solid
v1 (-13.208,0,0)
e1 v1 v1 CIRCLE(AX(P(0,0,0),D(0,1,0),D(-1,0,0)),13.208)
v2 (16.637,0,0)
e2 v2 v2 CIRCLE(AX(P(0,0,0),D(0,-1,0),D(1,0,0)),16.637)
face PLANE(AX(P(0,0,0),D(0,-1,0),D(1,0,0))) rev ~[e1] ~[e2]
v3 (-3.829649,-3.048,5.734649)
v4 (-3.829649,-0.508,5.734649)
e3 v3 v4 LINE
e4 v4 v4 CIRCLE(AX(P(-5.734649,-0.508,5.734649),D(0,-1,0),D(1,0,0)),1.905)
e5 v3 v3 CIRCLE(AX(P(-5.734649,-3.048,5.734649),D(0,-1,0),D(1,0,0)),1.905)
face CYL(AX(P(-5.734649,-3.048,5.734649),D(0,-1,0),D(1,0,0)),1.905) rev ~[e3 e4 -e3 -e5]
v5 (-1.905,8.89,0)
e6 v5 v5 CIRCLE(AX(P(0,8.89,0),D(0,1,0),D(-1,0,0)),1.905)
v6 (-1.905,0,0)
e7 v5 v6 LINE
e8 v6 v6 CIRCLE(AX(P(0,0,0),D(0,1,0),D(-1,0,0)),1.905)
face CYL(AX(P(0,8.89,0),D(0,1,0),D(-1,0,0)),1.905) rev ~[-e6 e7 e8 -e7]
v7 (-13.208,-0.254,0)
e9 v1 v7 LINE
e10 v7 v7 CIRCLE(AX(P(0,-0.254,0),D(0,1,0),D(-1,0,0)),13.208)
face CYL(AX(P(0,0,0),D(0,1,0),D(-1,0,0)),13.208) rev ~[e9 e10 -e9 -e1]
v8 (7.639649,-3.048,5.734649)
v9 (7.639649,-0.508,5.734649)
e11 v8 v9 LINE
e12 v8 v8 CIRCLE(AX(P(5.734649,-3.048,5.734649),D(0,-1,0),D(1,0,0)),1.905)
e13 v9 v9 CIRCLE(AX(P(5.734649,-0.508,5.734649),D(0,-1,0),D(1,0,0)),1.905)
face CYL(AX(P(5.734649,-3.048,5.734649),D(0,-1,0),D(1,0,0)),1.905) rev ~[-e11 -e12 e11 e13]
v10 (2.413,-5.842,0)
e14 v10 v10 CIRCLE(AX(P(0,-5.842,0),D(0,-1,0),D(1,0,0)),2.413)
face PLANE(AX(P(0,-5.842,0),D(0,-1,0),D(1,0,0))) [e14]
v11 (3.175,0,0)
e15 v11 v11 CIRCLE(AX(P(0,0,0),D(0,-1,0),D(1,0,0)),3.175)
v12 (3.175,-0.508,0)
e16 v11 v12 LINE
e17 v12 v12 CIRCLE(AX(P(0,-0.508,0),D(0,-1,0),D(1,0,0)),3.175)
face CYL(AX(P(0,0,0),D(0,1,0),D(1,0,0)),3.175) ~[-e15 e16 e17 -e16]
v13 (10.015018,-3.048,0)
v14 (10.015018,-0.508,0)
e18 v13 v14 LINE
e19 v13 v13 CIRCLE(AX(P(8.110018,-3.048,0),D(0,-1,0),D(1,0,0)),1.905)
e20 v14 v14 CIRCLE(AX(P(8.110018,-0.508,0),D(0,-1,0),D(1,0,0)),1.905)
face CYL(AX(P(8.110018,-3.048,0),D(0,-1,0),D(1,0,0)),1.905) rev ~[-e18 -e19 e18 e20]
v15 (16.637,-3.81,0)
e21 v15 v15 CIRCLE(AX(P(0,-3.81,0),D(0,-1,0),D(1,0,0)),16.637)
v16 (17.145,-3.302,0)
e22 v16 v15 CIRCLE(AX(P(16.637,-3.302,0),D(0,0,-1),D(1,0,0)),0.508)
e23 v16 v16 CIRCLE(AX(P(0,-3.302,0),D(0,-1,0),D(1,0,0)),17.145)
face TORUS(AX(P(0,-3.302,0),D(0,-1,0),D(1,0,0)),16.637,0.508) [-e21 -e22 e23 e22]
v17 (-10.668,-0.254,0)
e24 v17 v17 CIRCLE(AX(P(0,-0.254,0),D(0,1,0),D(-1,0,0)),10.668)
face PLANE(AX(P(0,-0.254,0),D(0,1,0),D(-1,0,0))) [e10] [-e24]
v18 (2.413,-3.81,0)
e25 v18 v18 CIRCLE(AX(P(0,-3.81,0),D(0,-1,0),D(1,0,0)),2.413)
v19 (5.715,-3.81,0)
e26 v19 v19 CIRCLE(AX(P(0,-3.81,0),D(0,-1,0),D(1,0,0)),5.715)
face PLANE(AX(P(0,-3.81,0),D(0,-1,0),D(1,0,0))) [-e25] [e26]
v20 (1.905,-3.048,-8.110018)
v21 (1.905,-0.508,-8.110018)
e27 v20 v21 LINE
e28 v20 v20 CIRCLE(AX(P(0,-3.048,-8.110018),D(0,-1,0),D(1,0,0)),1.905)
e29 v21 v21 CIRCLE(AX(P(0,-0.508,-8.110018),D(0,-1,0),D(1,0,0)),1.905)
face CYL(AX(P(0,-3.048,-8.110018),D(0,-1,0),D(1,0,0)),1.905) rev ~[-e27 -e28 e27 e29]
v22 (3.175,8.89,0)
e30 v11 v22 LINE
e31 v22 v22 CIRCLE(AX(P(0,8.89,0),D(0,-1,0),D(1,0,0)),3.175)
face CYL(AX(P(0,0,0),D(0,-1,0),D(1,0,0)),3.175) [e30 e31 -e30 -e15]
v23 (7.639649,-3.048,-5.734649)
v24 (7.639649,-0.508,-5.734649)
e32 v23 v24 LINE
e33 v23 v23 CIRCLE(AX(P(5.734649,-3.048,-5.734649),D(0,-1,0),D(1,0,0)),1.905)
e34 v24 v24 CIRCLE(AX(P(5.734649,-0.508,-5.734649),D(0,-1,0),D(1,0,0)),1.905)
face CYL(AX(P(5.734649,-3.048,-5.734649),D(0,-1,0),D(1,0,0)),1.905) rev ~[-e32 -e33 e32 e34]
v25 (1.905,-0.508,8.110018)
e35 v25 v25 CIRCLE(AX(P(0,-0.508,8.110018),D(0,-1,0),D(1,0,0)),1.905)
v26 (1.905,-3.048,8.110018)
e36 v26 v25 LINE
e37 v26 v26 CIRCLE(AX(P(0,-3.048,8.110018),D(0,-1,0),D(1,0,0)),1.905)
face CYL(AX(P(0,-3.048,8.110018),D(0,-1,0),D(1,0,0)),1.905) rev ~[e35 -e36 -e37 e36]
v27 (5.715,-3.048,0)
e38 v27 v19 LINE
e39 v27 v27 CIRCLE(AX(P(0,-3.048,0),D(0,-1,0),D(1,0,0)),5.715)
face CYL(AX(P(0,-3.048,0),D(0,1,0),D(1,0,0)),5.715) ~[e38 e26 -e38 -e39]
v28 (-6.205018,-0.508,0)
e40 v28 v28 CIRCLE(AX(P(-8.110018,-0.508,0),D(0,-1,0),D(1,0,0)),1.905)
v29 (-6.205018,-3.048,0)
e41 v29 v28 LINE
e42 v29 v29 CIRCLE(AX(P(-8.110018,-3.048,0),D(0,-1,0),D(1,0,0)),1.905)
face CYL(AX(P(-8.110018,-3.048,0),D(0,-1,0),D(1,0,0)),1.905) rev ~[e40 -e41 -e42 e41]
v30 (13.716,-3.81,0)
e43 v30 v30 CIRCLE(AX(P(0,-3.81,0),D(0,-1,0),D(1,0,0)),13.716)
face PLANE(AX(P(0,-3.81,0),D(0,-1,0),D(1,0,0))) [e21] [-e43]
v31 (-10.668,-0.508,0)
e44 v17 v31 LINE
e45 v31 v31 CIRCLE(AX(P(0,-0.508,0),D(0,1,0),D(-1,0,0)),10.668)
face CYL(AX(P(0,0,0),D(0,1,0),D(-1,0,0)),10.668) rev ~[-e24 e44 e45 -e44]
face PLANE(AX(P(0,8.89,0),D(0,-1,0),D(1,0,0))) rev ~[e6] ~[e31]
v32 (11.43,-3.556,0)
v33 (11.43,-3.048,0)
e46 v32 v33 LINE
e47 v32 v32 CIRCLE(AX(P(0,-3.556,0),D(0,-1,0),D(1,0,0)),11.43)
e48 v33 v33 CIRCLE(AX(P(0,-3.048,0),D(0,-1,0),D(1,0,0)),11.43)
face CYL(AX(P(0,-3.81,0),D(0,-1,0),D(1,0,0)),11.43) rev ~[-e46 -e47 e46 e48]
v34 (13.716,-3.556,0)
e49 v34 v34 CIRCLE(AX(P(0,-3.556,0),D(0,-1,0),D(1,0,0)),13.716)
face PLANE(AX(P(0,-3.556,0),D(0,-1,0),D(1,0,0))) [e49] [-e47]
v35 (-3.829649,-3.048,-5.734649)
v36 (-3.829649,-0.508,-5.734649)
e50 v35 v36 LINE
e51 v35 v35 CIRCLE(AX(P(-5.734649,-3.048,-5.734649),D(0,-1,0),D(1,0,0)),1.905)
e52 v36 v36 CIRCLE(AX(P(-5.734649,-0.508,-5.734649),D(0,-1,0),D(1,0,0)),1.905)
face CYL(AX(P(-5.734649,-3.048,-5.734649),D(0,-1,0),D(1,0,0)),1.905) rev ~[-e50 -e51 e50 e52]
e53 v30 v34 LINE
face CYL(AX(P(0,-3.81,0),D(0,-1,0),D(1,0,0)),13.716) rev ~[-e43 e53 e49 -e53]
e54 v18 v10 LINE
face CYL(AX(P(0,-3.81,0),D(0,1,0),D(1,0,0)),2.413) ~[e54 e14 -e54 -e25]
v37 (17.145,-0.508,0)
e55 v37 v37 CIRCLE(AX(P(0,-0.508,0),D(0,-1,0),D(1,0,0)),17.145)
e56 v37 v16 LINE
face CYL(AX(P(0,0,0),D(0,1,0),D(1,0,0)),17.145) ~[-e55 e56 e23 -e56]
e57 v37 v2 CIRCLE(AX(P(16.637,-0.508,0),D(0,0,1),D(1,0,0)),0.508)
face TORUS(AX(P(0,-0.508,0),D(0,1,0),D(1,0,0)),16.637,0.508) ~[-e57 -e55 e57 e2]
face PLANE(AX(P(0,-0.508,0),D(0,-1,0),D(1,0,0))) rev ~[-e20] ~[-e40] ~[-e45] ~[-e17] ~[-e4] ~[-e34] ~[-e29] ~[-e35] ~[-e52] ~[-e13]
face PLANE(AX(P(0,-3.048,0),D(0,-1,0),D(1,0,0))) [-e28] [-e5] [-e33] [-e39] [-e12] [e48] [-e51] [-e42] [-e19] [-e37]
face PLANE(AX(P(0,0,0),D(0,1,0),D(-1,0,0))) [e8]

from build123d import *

# Parameters (mm, degrees)
F0_R      = 17.145
F1_DEPTH  = 3.81
F2_R      = 13.716
F2_R_2    = 11.43
F3_DEPTH  = 0.254
F4_DEPTH  = 0.762
F5_R      = 5.715
F6_DEPTH  = 0.762
F8_R      = 1.905
F9_DEPTH  = 25.4
F10_R     = 2.413
F11_DEPTH = 2.032
F14_R     = 3.175
F15_DEPTH = 8.89
F16_R     = 1.905
F17_DEPTH = 8.89
F18_R     = 0.508
F19_R     = 0.508
F20_R     = 13.208
F20_R_2   = 10.668
F21_DEPTH = 0.254
F22_DEPTH = 0.508


# Not quite as in the source:
# - the program builds the solid bodies; features that only make, move or delete a surface that nothing else refers to are left out


with BuildPart() as f1:
    # F0 (on Front) → F1 (new body)
    with BuildSketch(Plane.XZ):
        Circle(F0_R)
    extrude(amount=F1_DEPTH)

    # F2 (on face) → F3 (cut)
    with BuildSketch(Plane.XZ.offset(3.81)):
        Circle(F2_R)
        Circle(F2_R_2, mode=Mode.SUBTRACT)
    extrude(amount=-F3_DEPTH, mode=Mode.SUBTRACT)

    # F4 (cut): a face of the model
    f4_faces = [f1.faces().sort_by_distance(p)[0] for p in [
        (0, -3.81, 0),
    ]]
    extrude(f4_faces, amount=-F4_DEPTH, mode=Mode.SUBTRACT)

    # F5 (on face) → F6 (join)
    with BuildSketch(Plane.XZ.offset(3.048)):
        Circle(F5_R)
    extrude(amount=F6_DEPTH)

    # F8 (on face) → F9 (cut)
    with BuildSketch(Plane.XZ.offset(3.048)):
        with Locations((0, 8.1100180022)):
            Circle(F8_R)
        with Locations((-5.7346487249, 5.7346487249)):
            Circle(F8_R)
        with Locations((-5.7346487249, -5.7346487249)):
            Circle(F8_R)
        with Locations((0, -8.1100180022)):
            Circle(F8_R)
        with Locations((5.7346487249, -5.7346487249)):
            Circle(F8_R)
        with Locations((8.1100180022, 0)):
            Circle(F8_R)
        with Locations((5.7346487249, 5.7346487249)):
            Circle(F8_R)
        with Locations((-8.1100180022, 0)):
            Circle(F8_R)
    extrude(amount=-F9_DEPTH, mode=Mode.SUBTRACT)

    # F10 (on face) → F11 (join)
    with BuildSketch(Plane.XZ.offset(3.81)):
        Circle(F10_R)
    extrude(amount=F11_DEPTH)

    # F14 (on Front) → F15 (join)
    with BuildSketch(Plane.XZ):
        Circle(F14_R)
    extrude(amount=-F15_DEPTH)

    # F16 (on face) → F17 (cut)
    with BuildSketch(Plane(origin=(0, 8.89, 0), x_dir=(-1, 0, 0), z_dir=(0, 1, 0))):
        Circle(F16_R)
    extrude(amount=-F17_DEPTH, mode=Mode.SUBTRACT)

    # F18
    f18_edges = [f1.edges().sort_by_distance(p)[0] for p in [
        (-17.145, -3.81, 0),
    ]]
    fillet(f18_edges, radius=F18_R)

    # F19
    f19_edges = [f1.edges().sort_by_distance(p)[0] for p in [
        (-17.145, 0, 0),
    ]]
    fillet(f19_edges, radius=F19_R)

    # F20 (on face) → F21 (cut)
    with BuildSketch(Plane(origin=(0, 0, 0), x_dir=(-1, 0, 0), z_dir=(0, 1, 0))):
        Circle(F20_R)
        Circle(F20_R_2, mode=Mode.SUBTRACT)
    extrude(amount=-F21_DEPTH, mode=Mode.SUBTRACT)

    # F22 (cut): a face of the model
    f22_faces = [f1.faces().sort_by_distance(p)[0] for p in [
        (10.3662633943, 0, 0),
    ]]
    extrude(f22_faces, amount=-F22_DEPTH, mode=Mode.SUBTRACT)


solid = f1.part
